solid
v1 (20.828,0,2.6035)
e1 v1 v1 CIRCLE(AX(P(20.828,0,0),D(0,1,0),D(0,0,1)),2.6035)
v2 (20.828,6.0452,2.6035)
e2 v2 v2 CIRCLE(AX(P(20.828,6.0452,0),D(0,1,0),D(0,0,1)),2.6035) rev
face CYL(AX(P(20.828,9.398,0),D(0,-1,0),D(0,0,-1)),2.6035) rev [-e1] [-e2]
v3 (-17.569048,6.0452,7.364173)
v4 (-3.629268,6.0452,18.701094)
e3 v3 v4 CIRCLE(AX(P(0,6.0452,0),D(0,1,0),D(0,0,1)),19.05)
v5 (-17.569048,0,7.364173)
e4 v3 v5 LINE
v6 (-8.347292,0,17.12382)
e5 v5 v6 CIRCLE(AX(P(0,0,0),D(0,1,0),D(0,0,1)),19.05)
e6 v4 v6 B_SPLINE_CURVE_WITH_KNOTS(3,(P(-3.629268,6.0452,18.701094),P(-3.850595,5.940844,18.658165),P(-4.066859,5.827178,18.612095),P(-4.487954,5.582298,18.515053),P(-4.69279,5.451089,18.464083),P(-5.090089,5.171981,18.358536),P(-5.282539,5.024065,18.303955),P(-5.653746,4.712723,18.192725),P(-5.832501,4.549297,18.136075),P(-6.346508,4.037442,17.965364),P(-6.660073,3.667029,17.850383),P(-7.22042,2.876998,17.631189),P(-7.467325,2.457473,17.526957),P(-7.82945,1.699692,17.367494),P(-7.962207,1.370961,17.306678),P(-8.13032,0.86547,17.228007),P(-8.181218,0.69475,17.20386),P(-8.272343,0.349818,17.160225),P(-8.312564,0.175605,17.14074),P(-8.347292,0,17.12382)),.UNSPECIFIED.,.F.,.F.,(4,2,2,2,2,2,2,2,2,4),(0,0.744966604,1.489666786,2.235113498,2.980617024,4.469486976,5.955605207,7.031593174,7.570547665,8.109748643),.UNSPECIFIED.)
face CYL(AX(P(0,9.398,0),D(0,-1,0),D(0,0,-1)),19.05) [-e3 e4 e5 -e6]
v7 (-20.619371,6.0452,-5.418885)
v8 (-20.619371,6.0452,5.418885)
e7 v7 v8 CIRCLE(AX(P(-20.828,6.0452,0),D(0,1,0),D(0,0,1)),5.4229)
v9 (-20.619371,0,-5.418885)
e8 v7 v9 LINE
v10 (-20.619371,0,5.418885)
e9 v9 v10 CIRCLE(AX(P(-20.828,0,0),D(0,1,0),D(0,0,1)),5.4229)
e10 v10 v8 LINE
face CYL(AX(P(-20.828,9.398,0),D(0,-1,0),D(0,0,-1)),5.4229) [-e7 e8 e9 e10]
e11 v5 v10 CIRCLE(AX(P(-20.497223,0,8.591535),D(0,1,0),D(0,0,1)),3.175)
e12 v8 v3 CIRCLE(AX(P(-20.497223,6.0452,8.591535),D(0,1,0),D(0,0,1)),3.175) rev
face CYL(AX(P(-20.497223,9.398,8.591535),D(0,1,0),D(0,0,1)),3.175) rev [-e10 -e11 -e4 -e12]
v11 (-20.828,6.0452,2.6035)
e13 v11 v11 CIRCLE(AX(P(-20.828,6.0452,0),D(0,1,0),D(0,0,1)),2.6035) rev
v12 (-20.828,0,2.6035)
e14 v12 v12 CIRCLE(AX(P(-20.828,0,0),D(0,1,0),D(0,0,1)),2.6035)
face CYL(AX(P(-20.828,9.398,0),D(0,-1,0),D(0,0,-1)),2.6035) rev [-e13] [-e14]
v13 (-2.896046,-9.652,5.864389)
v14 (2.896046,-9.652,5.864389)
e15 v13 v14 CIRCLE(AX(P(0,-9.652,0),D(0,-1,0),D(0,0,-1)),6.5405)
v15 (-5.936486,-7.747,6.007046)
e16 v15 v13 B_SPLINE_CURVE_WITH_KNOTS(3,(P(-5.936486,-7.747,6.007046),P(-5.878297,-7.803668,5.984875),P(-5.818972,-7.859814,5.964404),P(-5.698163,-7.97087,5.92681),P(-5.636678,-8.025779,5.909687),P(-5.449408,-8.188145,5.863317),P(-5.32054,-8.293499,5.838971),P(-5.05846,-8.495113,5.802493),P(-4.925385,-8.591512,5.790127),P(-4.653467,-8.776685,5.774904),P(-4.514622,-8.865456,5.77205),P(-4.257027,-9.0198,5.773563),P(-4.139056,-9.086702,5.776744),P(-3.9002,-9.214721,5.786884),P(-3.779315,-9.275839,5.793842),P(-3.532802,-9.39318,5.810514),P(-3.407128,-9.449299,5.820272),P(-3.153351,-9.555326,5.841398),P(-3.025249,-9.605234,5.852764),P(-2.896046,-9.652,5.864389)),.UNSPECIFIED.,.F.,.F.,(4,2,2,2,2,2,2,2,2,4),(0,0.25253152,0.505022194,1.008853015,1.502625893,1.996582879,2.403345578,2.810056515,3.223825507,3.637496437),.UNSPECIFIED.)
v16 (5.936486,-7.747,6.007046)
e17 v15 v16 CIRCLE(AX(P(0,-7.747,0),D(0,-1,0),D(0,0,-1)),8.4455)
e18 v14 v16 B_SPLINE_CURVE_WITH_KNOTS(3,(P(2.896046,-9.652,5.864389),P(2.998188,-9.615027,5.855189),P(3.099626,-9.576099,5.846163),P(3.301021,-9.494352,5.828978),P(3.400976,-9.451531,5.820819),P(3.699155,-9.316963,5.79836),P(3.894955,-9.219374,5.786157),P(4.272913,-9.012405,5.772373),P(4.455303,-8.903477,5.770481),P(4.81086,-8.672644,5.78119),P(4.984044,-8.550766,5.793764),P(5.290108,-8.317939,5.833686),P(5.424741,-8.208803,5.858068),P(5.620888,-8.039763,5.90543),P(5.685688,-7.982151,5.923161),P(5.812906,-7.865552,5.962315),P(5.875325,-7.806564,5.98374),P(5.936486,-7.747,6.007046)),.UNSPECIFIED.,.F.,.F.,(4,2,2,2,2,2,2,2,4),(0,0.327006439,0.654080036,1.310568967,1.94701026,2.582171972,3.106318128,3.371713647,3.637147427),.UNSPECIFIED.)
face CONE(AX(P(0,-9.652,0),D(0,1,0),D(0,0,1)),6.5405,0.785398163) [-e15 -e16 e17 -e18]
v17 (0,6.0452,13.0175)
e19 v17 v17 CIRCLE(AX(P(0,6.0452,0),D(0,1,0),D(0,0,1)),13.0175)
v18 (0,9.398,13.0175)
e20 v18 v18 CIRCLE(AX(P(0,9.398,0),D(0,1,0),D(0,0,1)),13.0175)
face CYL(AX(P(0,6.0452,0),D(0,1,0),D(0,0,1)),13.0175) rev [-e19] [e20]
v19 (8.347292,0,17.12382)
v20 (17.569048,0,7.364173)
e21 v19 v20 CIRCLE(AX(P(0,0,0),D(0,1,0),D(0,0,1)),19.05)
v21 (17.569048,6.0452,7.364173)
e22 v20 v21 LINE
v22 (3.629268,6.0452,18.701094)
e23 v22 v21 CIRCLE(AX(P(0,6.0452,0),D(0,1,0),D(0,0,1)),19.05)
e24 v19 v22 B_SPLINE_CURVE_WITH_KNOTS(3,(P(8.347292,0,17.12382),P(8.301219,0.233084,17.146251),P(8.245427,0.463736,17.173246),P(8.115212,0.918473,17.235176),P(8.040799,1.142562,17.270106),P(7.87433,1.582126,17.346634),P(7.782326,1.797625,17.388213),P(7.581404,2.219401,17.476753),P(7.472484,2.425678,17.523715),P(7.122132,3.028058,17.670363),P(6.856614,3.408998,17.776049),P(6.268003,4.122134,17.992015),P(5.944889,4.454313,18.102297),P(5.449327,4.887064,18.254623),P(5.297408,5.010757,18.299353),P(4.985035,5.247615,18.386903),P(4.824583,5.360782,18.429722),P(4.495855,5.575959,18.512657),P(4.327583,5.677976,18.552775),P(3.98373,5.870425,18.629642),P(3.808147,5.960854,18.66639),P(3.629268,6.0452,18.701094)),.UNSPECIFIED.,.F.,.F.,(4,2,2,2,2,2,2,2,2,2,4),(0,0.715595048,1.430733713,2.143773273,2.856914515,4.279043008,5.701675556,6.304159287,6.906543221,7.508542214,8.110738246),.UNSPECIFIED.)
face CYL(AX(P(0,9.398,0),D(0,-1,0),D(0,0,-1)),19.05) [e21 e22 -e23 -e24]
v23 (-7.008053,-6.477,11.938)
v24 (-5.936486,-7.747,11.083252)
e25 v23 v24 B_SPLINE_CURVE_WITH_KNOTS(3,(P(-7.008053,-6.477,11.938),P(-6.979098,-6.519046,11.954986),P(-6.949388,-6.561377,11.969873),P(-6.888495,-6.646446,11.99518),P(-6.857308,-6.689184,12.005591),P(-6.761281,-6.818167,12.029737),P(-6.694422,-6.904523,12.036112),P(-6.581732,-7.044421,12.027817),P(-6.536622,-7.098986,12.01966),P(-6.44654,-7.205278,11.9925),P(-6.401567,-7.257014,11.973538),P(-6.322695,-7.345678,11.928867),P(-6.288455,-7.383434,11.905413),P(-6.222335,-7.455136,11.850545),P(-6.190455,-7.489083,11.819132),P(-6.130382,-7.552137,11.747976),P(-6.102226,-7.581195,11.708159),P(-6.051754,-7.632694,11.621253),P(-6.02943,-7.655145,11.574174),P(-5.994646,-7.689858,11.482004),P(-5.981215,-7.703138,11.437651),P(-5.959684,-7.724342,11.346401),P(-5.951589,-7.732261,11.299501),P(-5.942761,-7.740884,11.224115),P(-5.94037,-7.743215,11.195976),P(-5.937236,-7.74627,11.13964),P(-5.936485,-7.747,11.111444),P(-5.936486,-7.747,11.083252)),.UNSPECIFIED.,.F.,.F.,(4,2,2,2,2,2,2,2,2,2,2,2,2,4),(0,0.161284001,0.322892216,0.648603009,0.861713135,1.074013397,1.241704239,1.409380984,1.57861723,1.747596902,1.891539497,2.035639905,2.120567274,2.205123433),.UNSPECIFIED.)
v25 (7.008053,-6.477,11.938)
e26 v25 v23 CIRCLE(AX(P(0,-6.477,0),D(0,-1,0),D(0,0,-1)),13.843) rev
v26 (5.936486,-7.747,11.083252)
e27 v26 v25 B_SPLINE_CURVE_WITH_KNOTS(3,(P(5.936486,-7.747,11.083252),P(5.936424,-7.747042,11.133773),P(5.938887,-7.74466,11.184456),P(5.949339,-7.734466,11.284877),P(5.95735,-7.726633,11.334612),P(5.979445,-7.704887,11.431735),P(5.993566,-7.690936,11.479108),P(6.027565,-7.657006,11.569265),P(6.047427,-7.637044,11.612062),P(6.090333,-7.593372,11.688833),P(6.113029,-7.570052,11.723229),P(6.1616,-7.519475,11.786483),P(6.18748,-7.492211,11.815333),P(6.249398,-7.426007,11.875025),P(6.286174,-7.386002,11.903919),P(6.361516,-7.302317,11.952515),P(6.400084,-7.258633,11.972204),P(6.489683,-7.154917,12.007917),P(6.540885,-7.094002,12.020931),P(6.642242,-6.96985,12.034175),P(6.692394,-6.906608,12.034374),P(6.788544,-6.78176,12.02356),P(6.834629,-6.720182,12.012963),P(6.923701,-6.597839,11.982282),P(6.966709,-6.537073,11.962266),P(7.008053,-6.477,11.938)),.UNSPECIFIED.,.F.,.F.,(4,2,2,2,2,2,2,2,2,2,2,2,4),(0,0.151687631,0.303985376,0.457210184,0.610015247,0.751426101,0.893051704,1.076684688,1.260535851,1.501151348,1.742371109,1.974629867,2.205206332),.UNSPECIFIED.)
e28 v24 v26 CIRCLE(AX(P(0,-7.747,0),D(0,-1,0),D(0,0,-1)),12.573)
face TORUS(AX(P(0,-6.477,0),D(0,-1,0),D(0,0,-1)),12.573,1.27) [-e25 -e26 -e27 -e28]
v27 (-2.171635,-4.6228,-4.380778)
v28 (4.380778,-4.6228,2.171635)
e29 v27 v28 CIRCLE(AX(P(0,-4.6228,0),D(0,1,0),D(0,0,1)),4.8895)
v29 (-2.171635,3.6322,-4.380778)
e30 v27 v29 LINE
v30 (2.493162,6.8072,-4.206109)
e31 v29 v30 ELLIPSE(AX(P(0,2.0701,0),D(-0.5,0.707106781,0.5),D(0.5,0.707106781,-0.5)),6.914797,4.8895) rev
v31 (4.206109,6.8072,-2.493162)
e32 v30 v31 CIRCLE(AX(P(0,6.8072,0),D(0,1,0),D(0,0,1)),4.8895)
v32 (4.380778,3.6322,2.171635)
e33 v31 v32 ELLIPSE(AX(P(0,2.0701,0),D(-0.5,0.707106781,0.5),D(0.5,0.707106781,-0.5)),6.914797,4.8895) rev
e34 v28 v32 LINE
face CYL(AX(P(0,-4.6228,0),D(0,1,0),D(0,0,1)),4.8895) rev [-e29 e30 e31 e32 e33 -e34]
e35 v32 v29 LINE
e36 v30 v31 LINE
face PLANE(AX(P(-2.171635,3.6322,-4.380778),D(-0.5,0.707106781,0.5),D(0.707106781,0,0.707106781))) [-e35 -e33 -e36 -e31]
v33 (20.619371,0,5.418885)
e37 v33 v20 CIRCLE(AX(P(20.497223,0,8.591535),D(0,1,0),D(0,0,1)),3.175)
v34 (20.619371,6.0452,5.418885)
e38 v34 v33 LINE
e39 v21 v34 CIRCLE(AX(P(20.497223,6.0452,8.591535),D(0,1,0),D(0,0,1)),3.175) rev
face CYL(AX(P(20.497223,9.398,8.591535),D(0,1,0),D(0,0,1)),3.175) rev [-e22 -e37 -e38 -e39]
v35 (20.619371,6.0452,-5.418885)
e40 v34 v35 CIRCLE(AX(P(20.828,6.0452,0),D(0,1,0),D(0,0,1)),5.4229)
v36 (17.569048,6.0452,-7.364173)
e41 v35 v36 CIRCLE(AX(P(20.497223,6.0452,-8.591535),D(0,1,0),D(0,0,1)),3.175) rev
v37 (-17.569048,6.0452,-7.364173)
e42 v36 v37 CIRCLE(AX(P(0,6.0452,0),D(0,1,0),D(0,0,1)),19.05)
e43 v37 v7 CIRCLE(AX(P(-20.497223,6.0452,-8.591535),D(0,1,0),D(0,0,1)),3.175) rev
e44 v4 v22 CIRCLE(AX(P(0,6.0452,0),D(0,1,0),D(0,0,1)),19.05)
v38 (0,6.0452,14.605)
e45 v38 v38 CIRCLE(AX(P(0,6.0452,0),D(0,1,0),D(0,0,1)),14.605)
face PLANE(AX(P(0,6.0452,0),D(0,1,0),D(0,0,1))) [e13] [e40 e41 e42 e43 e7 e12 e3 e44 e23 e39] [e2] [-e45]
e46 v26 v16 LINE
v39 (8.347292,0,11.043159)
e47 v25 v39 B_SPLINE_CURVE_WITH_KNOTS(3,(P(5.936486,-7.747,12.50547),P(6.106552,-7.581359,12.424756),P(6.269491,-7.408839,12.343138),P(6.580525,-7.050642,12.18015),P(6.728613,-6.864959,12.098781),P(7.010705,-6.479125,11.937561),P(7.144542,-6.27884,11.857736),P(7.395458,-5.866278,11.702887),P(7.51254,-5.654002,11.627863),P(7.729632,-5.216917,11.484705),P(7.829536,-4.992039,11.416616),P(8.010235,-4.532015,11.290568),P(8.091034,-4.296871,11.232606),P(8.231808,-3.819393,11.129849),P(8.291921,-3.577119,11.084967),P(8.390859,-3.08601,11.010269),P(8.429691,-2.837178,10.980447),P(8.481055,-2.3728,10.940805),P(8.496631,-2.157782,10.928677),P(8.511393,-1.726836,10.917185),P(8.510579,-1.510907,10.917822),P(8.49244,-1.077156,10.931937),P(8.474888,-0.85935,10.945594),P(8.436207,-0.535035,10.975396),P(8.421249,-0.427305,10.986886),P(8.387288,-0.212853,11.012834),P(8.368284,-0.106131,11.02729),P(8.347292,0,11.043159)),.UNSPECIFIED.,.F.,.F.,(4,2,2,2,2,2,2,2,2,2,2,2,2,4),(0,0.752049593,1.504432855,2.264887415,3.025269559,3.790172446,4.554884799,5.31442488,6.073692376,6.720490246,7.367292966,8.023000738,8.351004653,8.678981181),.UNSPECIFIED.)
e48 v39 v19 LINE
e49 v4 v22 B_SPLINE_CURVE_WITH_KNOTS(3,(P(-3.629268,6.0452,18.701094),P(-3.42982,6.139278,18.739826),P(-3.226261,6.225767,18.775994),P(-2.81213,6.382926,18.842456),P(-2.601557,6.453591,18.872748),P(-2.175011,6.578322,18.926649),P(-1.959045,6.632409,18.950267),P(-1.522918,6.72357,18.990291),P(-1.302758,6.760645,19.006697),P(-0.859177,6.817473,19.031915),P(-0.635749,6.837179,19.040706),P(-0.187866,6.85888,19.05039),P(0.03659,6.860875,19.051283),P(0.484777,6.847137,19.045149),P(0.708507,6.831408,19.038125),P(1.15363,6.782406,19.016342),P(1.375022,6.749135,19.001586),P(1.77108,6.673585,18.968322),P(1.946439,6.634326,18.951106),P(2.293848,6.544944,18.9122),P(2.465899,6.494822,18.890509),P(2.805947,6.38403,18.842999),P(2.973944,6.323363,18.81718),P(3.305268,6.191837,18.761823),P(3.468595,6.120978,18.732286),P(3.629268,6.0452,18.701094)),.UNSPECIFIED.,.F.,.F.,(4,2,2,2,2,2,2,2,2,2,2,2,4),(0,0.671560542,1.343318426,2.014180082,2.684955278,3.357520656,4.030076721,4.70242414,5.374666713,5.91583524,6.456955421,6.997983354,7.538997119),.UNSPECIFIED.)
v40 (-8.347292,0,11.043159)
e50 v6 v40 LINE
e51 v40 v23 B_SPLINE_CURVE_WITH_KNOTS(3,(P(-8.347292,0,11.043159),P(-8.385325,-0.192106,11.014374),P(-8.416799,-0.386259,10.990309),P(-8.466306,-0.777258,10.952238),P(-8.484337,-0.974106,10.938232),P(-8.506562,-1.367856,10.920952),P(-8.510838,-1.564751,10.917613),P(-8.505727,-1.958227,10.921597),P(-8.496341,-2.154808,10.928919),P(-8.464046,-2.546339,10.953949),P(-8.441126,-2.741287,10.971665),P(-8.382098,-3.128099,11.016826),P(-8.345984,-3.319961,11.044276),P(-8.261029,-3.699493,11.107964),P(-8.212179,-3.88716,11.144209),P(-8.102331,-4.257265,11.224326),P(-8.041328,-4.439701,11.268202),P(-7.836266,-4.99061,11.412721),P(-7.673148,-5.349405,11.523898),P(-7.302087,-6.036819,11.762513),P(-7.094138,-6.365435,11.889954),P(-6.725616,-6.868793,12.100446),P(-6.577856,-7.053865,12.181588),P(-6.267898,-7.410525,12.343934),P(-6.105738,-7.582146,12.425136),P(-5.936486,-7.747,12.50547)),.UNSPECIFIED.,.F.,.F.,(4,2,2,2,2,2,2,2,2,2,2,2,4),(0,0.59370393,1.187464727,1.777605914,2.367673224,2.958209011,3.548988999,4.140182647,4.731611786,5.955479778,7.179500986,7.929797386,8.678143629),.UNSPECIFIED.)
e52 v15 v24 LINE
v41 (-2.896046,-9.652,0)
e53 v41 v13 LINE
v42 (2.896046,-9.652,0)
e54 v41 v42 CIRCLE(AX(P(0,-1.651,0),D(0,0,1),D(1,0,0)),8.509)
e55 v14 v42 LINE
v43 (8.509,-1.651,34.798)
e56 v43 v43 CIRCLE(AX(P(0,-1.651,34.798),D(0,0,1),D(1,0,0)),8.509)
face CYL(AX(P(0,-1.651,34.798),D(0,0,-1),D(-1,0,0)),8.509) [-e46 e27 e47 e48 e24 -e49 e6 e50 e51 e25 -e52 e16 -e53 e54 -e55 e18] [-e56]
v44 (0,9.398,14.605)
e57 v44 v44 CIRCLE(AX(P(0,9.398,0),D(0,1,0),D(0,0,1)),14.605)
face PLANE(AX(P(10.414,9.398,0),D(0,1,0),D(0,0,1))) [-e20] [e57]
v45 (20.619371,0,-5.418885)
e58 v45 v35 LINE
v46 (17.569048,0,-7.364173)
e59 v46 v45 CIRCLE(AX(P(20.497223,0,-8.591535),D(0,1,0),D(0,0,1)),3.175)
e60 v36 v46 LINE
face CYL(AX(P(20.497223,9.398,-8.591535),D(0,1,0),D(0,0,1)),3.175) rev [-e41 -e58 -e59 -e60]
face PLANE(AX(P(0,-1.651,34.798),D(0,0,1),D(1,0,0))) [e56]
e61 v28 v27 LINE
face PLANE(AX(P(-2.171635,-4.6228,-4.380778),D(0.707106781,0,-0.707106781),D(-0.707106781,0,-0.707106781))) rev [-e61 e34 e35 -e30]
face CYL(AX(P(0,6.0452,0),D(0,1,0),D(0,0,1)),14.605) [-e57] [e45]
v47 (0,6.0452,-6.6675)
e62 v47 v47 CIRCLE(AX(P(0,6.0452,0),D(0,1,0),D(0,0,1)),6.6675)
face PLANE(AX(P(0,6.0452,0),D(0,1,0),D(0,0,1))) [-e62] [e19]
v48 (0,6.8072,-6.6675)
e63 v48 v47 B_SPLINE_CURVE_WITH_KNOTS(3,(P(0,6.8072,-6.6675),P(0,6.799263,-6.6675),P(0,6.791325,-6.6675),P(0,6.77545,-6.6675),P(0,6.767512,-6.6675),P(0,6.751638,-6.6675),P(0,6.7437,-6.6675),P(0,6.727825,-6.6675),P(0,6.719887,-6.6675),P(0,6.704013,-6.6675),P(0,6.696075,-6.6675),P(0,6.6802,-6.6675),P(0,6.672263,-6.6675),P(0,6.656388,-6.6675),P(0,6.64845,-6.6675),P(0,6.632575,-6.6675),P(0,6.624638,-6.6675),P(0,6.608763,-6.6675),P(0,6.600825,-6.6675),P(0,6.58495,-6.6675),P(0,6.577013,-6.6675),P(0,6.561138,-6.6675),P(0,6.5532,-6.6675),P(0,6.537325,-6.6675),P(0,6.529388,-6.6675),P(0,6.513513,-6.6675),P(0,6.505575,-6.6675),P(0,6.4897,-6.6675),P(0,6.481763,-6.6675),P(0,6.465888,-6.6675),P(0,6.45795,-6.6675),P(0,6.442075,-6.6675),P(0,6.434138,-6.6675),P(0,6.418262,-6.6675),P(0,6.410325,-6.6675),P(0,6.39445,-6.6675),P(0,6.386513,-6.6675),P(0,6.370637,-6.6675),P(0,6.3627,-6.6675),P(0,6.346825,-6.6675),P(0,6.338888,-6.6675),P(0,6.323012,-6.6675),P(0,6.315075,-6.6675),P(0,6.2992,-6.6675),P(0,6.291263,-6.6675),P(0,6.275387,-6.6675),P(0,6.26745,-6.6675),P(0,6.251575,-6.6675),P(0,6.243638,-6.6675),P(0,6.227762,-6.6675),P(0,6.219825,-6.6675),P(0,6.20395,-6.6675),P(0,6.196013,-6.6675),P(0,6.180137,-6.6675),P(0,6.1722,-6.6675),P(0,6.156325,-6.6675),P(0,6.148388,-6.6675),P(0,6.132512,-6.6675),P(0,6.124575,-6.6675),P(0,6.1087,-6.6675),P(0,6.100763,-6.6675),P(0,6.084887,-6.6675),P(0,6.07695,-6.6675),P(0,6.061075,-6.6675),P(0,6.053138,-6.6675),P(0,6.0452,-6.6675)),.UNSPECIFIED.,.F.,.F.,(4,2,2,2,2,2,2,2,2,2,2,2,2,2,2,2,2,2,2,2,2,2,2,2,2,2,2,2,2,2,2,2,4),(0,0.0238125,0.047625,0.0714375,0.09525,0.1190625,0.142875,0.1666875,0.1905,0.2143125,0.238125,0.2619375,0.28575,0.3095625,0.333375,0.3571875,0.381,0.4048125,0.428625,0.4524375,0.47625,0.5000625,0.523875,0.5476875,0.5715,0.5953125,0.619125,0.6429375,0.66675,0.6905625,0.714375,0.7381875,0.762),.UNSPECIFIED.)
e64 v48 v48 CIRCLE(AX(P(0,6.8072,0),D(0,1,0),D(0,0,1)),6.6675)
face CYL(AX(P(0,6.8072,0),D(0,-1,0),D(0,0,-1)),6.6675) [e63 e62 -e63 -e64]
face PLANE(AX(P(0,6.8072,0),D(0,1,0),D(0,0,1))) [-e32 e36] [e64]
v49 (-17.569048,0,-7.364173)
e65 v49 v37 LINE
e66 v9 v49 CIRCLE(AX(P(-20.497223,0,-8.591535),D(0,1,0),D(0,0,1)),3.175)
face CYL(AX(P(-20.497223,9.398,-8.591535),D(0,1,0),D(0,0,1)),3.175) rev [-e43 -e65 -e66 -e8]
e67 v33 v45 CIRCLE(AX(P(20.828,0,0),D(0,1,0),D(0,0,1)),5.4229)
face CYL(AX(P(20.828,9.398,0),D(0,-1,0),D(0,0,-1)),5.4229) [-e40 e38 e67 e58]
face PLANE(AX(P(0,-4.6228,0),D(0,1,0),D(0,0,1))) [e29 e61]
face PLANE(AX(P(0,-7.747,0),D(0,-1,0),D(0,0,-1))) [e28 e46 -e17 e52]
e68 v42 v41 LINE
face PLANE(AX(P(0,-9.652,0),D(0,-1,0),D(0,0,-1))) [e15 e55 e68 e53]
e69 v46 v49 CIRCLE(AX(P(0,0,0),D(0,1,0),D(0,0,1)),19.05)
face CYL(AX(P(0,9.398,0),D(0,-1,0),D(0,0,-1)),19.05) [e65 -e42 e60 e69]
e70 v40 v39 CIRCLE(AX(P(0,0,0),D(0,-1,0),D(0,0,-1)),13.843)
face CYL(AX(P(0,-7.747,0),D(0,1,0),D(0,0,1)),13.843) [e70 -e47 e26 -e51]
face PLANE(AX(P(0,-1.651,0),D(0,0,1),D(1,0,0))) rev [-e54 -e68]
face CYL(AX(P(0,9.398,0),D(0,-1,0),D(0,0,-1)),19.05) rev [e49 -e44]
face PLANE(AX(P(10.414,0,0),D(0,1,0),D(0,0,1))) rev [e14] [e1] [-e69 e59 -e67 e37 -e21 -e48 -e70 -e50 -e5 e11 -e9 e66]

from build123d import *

# Parameters (mm, degrees)
SKETCH3_R           = 2.6035
BOSS_EXTRUDE1_DEPTH = 9.398
CUT_EXTRUDE1_START  = -3.3528
SKETCH4_R           = 14.605
SKETCH4_R_2         = 2.6035
SKETCH4_R_3         = 13.0175
CUT_EXTRUDE1_DEPTH  = 3.3528
SKETCH5_R           = 13.843
BOSS_EXTRUDE2_DEPTH = 7.747
SKETCH6_R           = 8.4455
BOSS_EXTRUDE3_DEPTH = 1.905
SKETCH7_R           = 8.509
BOSS_EXTRUDE4_DEPTH = 34.798
CUT_EXTRUDE2_DEPTH  = 47.503968347
FILLET1_R           = 3.175
CHAMFER1_SIZE       = 1.905
SKETCH9_R           = 6.6675
BOSS_EXTRUDE5_DEPTH = 0.762
CUT_EXTRUDE3_DEPTH  = 11.43
CHAMFER2_SIZE       = 3.175
FILLET2_R           = 1.27


with BuildPart() as part:
    # Sketch3 → Boss-Extrude1 (new body)
    with BuildSketch(Plane(origin=(0, 0, 0), x_dir=(1, 0, 0), z_dir=(0, 1, 0))):
        with BuildLine():
            ThreePointArc((18.41992125, -4.85890946), (26.2509, 0), (18.41992125, 4.85890946))
            ThreePointArc((18.41992125, 4.85890946), (0, 19.05), (-18.41992125, 4.85890946))
            ThreePointArc((-18.41992125, 4.85890946), (-26.2509, 0), (-18.41992125, -4.85890946))
            ThreePointArc((-18.41992125, -4.85890946), (0, -19.05), (18.41992125, -4.85890946))
        make_face()
        with Locations(Location((-20.828, 0, 0), (0, 0, 270))):
            Circle(SKETCH3_R, mode=Mode.SUBTRACT)
        with Locations(Location((20.828, 0, 0), (0, 0, 270))):
            Circle(SKETCH3_R, mode=Mode.SUBTRACT)
    extrude(amount=BOSS_EXTRUDE1_DEPTH)

    # Sketch4 → Cut-Extrude1 (cut)
    # profile 1 of 2: a face of its own
    with BuildSketch(Plane(origin=(0, 9.398, 0), x_dir=(1, 0, 0), z_dir=(0, 1, 0)).offset(CUT_EXTRUDE1_START)):
        with BuildLine():
            ThreePointArc((-18.41992125, 4.85890946), (-26.2509, 0), (-18.41992125, -4.85890946))
            ThreePointArc((-18.41992125, -4.85890946), (0, -19.05), (18.41992125, -4.85890946))
            ThreePointArc((18.41992125, -4.85890946), (26.2509, 0), (18.41992125, 4.85890946))
            ThreePointArc((18.41992125, 4.85890946), (0, 19.05), (-18.41992125, 4.85890946))
        make_face()
        with Locations(Location((0, 0, 0), (0, 0, 270))):
            Circle(SKETCH4_R, mode=Mode.SUBTRACT)
        with Locations(Location((20.828, 0, 0), (0, 0, 270))):
            Circle(SKETCH4_R_2, mode=Mode.SUBTRACT)
        with Locations(Location((-20.828, 0, 0), (0, 0, 270))):
            Circle(SKETCH4_R_2, mode=Mode.SUBTRACT)
    # profile 2 of 2: a face of its own
    with BuildSketch(Plane(origin=(0, 9.398, 0), x_dir=(1, 0, 0), z_dir=(0, 1, 0)).offset(CUT_EXTRUDE1_START)):
        with Locations(Location((0, 0, 0), (0, 0, 270))):
            Circle(SKETCH4_R_3)
    extrude(amount=CUT_EXTRUDE1_DEPTH, mode=Mode.SUBTRACT)

    # Sketch5 → Boss-Extrude2 (add)
    with BuildSketch(Plane.XZ):
        with Locations(Location((0, 0, 0), (0, 0, 270))):
            Circle(SKETCH5_R)
    extrude(amount=BOSS_EXTRUDE2_DEPTH)

    # Sketch6 → Boss-Extrude3 (add)
    with BuildSketch(Plane.XZ.offset(7.747)):
        with Locations(Location((0, 0, 0), (0, 0, 90))):
            Circle(SKETCH6_R)
    extrude(amount=BOSS_EXTRUDE3_DEPTH)

    # Sketch7 → Boss-Extrude4 (add)
    with BuildSketch(Plane.XY):
        with Locations(Location((0, -1.651, 0), (0, 0, 168.811944249))):
            Circle(SKETCH7_R)
    extrude(amount=BOSS_EXTRUDE4_DEPTH)

    # Sketch8 → Cut-Extrude2 (cut, through all)
    with BuildSketch(Plane(origin=(0, 6.0452, 0), x_dir=(1, 0, 0), z_dir=(0, 1, 0))):
        with BuildLine():
            Line((-3.629268047, 0), (-3.629268047, -12.501348715))
            ThreePointArc((-3.629268047, -12.501348715), (0, -13.0175), (3.629268047, -12.501348715))
            Line((3.629268047, -12.501348715), (3.629268047, 0))
            Line((3.629268047, 0), (-3.629268047, 0))
        make_face()
        with BuildLine():
            ThreePointArc((-3.629268047, -18.70109391), (0, -19.05), (3.629268047, -18.70109391))
            Line((3.629268047, -18.70109391), (3.629268047, -14.146887942))
            ThreePointArc((3.629268047, -14.146887942), (0, -14.605), (-3.629268047, -14.146887942))
            Line((-3.629268047, -14.146887942), (-3.629268047, -18.70109391))
        make_face()
    extrude(amount=CUT_EXTRUDE2_DEPTH, mode=Mode.SUBTRACT)

    # Fillet1
    fillet1_edges = [part.edges().sort_by_distance(p)[0] for p in [
        (-18.41992125, 3.0226, 4.85890946),
        (-18.41992125, 3.0226, -4.85890946),
        (18.41992125, 3.0226, -4.85890946),
        (18.41992125, 3.0226, 4.85890946),
    ]]
    fillet(fillet1_edges, radius=FILLET1_R)

    # Chamfer1
    chamfer1_edges = [part.edges().sort_by_distance(p)[0] for p in [
        (0, -9.652, -8.4455),
    ]]
    chamfer(chamfer1_edges, length=CHAMFER1_SIZE - 0.0001)  # a hair under: the kernel refuses the full size

    # Sketch9 → Boss-Extrude5 (add)
    with BuildSketch(Plane(origin=(0, 6.0452, 0), x_dir=(1, 0, 0), z_dir=(0, 1, 0))):
        with Locations(Location((0, 0, 0), (0, 0, 90))):
            Circle(SKETCH9_R)
    extrude(amount=BOSS_EXTRUDE5_DEPTH)

    # Sketch10 → Cut-Extrude3 (cut)
    with BuildSketch(Plane(origin=(0, 6.8072, 0), x_dir=(1, 0, 0), z_dir=(0, 1, 0))):
        with BuildLine():
            Line((-2.171634675, 4.380777681), (4.380777681, -2.171634675))
            ThreePointArc((4.380777681, -2.171634675), (-3.457398607, -3.457398607), (-2.171634675, 4.380777681))
        make_face()
    extrude(amount=-CUT_EXTRUDE3_DEPTH, mode=Mode.SUBTRACT)

    # Chamfer2
    chamfer2_edges = [part.edges().sort_by_distance(p)[0] for p in [
        (1.104571503, 6.8072, -1.104571503),
    ]]
    chamfer(chamfer2_edges, length=CHAMFER2_SIZE)

    # Fillet2
    fillet2_edges = [part.edges().sort_by_distance(p)[0] for p in [
        (0, -7.747, -13.843),
    ]]
    fillet(fillet2_edges, radius=FILLET2_R)


solid = part.part
